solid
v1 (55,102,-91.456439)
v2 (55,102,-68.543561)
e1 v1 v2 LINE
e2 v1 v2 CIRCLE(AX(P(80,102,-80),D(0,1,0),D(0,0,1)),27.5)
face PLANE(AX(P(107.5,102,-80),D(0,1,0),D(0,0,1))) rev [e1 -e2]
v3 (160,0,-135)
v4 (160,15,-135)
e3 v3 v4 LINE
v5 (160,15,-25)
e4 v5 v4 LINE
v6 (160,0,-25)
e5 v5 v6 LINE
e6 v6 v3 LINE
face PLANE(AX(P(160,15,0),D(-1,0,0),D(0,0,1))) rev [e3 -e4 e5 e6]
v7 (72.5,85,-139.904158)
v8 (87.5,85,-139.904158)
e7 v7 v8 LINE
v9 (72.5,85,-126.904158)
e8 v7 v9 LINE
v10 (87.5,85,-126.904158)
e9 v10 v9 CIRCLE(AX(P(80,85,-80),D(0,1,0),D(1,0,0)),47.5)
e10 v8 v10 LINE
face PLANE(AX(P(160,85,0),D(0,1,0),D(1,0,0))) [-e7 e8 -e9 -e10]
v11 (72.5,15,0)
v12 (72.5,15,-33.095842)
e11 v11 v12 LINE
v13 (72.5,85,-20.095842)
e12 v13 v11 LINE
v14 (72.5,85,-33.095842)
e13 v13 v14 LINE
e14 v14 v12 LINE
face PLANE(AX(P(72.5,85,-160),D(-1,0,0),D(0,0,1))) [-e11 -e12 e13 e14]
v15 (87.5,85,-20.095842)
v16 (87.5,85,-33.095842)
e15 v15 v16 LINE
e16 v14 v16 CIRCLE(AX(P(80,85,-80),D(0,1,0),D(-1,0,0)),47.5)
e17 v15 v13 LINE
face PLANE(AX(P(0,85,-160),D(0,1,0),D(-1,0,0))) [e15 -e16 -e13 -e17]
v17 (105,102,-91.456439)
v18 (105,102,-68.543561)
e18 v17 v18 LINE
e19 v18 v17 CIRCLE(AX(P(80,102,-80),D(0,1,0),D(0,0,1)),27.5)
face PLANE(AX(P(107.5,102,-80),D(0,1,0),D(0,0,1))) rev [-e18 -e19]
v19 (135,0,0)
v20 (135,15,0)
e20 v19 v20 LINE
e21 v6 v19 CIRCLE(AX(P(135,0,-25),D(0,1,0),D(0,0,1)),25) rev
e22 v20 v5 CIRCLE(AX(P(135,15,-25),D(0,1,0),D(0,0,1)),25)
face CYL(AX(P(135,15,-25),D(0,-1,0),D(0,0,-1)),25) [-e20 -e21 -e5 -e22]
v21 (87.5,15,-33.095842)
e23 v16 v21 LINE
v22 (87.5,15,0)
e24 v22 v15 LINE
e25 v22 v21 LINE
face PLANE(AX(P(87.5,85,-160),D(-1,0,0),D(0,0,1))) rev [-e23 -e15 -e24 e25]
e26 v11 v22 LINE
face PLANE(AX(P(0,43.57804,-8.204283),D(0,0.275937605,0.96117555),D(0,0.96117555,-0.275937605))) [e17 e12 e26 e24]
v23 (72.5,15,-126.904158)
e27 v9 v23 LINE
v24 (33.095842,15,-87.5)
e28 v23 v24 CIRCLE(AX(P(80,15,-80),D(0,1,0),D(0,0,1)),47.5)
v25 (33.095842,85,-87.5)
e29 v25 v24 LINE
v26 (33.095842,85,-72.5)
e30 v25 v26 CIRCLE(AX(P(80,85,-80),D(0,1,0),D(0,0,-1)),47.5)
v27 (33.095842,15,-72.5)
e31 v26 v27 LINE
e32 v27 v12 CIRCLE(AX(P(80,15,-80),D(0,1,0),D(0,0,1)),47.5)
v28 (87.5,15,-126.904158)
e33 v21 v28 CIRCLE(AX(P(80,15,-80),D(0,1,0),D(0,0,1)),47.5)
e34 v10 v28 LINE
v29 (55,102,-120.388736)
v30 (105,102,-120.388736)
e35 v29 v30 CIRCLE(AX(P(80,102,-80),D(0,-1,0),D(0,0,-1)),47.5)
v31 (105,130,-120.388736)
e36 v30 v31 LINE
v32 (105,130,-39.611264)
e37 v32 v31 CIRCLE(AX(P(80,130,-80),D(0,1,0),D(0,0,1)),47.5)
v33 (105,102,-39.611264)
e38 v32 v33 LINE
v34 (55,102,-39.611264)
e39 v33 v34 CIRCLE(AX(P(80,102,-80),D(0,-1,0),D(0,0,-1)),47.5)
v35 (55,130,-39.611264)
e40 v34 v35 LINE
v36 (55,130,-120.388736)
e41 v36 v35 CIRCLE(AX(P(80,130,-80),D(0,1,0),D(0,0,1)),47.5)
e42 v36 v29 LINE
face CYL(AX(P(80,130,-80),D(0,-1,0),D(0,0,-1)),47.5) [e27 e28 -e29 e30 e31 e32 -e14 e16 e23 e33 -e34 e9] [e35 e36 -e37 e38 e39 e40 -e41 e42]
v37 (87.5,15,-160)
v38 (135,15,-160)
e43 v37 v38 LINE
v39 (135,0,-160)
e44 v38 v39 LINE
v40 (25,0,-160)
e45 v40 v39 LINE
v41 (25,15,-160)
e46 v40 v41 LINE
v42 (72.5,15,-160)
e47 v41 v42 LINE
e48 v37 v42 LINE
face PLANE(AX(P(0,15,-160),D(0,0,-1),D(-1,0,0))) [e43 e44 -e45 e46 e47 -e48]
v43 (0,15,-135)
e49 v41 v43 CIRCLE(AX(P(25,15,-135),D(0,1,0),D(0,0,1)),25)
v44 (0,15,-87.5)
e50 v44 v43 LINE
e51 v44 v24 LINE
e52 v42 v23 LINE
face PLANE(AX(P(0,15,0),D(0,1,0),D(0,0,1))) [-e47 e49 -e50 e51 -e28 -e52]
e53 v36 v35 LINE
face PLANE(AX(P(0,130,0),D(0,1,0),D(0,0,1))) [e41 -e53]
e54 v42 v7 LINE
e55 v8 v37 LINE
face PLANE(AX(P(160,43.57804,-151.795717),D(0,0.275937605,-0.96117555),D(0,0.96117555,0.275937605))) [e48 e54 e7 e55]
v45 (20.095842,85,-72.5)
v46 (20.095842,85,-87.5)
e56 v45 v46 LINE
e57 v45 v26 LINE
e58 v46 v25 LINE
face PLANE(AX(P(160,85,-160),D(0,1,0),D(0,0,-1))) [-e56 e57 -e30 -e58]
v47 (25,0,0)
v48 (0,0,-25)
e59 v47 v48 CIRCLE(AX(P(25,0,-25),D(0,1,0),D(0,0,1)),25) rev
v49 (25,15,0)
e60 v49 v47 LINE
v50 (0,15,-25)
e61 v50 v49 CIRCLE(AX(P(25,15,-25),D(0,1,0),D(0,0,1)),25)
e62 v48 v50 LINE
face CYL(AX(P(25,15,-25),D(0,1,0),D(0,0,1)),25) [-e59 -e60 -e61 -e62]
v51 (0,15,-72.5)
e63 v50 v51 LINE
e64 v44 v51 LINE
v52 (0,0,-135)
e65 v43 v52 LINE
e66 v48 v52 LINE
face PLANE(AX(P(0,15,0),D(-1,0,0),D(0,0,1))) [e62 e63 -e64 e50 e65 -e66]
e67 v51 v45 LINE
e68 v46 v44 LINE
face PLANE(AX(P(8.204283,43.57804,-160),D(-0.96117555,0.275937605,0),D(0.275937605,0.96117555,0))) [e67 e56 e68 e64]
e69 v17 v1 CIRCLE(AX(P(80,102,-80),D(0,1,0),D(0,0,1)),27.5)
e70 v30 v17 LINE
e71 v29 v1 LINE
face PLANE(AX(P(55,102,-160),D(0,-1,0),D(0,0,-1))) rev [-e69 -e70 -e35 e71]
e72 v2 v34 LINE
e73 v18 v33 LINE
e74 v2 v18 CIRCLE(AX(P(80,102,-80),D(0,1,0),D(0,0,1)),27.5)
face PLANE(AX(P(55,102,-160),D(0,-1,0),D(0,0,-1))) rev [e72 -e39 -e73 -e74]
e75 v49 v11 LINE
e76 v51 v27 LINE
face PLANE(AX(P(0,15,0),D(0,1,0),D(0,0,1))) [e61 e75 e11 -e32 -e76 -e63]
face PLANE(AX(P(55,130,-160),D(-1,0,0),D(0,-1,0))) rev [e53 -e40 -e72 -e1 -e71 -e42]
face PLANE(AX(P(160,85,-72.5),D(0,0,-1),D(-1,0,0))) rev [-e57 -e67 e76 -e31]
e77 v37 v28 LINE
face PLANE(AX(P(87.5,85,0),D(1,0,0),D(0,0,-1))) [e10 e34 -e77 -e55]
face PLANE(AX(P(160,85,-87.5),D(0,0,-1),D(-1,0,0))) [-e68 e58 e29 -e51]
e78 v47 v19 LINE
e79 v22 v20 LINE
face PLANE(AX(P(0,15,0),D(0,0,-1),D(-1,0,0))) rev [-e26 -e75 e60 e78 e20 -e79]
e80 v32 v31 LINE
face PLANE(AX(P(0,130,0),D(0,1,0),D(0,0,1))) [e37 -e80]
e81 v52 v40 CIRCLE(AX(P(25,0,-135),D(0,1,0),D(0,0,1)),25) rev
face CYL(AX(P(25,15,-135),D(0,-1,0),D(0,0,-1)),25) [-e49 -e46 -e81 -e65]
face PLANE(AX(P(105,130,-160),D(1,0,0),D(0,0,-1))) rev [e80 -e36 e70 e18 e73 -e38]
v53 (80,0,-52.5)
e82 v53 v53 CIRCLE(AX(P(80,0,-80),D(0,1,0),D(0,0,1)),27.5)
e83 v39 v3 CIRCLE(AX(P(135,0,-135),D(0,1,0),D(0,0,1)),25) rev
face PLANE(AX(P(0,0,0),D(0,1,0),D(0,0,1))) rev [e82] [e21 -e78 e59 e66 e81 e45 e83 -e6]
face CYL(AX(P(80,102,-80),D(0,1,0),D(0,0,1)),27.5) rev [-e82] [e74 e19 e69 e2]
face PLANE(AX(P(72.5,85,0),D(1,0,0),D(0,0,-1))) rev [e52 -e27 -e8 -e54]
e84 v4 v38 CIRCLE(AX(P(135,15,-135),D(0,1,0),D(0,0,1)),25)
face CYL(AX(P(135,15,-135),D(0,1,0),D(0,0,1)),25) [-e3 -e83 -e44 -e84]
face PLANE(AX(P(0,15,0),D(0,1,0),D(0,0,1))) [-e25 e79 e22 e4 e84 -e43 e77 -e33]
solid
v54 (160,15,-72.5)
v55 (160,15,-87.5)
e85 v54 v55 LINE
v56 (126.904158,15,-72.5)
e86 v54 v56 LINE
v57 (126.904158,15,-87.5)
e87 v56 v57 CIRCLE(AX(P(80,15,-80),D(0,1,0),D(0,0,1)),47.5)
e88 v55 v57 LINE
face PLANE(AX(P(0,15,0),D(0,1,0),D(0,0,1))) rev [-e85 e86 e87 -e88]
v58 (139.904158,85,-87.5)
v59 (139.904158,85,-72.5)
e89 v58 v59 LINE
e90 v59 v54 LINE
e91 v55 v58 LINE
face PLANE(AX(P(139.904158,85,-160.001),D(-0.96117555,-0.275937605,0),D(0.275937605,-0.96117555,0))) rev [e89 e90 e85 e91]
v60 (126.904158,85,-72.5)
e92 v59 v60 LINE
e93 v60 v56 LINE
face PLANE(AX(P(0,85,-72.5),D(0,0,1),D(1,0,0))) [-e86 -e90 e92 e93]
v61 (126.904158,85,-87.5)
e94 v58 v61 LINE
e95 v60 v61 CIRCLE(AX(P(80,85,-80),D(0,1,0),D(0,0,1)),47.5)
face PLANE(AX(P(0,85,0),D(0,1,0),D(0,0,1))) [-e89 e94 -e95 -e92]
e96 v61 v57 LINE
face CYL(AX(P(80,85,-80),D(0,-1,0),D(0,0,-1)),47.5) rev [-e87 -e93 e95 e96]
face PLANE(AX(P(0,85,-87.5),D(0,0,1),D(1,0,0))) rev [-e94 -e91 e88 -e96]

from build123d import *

# Parameters (mm, degrees)
SKETCH1_W           = 160
SKETCH1_H           = 160
BOSS_EXTRUDE1_DEPTH = 15
SKETCH2_R           = 47.5
BOSS_EXTRUDE2_DEPTH = 115
BOSS_EXTRUDE3_DEPTH = 70
CUT_EXTRUDE1_DEPTH  = 15
CIRPATTERN1_START   = -87.5
CIRPATTERN1_DEPTH   = 15
CIRPATTERN1_START_2 = 72.5
CIRPATTERN1_2_DEPTH = 15
SKETCH4_W           = 50
SKETCH4_H           = 28
CUT_EXTRUDE2_DEPTH  = 261.959767014
SKETCH5_W           = 27.5
SKETCH5_H           = 102.001
FILLET1_R           = 25


# Read off the part's stored shape, not the designer's step: CirPattern1
with BuildPart() as part:
    # Sketch1 → Boss-Extrude1 (new body)
    with BuildSketch(Plane(origin=(0, 0, 0), x_dir=(1, 0, 0), z_dir=(0, 1, 0))):
        with Locations((80, 80)):
            Rectangle(SKETCH1_W, SKETCH1_H)
    extrude(amount=BOSS_EXTRUDE1_DEPTH)

    # Sketch2 → Boss-Extrude2 (add)
    with BuildSketch(Plane(origin=(0, 15, 0), x_dir=(1, 0, 0), z_dir=(0, 1, 0))):
        with Locations(Location((80, 80, 0), (0, 0, 270))):
            Circle(SKETCH2_R)
    extrude(amount=BOSS_EXTRUDE2_DEPTH)

    # CirPattern1 outline → CirPattern1 (add)
    with BuildSketch(Plane.XY.offset(CIRPATTERN1_START)):
        Polygon((82, 85), (20.095842402, 85), (0, 15), (82, 15), align=None)
    extrude(amount=CIRPATTERN1_DEPTH)

    # CirPattern1 2 outline → CirPattern1 2 (add)
    with BuildSketch(Plane.YZ.offset(CIRPATTERN1_START_2)):
        Polygon((15, -160), (85, -139.904157598), (85, -20.095842402), (15, 0), align=None)
    extrude(amount=CIRPATTERN1_2_DEPTH)

    # Sketch4 → Cut-Extrude2 (cut, through all)
    with BuildSketch(Plane.XY):
        with Locations((80, 116)):
            Rectangle(SKETCH4_W, SKETCH4_H)
    extrude(amount=-CUT_EXTRUDE2_DEPTH, mode=Mode.SUBTRACT)

    # Sketch5 → Ø12.0 (55) Diameter Hole1 (revolve, cut)
    with BuildSketch(Plane(origin=(80, 102, -80), x_dir=(0, 0, 1), z_dir=(1, 0, 0))):
        with Locations((13.75, 51.0005)):
            Rectangle(SKETCH5_W, SKETCH5_H)
    revolve(axis=Axis((80, 108.35, -80), (0, -1, 0)), mode=Mode.SUBTRACT)

    # Fillet1
    fillet1_edges = [part.edges().sort_by_distance(p)[0] for p in [
        (0, 7.5, 0),
        (0, 7.5, -160),
        (160, 7.5, -160),
        (160, 7.5, 0),
    ]]
    fillet(fillet1_edges, radius=FILLET1_R)


with BuildPart() as body_2:
    # Sketch2<5> → Boss-Extrude3 (new body)
    with BuildSketch(Plane(origin=(0, 15, 0), x_dir=(1, 0, 0), z_dir=(0, 1, 0))):
        with BuildLine():
            Line((126.904157598, 72.5), (160, 72.5))
            Line((160, 72.5), (160, 87.5))
            Line((160, 87.5), (126.904157598, 87.5))
            ThreePointArc((126.904157598, 87.5), (127.350805093, 83.761815658), (127.5, 80))
            ThreePointArc((127.5, 80), (127.350805093, 76.238184342), (126.904157598, 72.5))
        make_face()
    extrude(amount=BOSS_EXTRUDE3_DEPTH)

    # Sketch3 → Cut-Extrude1 (cut)
    with BuildSketch(Plane.XY.offset(-72.5)):
        Polygon((139.904157598, 85), (160, 15), (160, 85), align=None)
    extrude(amount=-CUT_EXTRUDE1_DEPTH, mode=Mode.SUBTRACT)


solid = Compound([part.part, body_2.part])
